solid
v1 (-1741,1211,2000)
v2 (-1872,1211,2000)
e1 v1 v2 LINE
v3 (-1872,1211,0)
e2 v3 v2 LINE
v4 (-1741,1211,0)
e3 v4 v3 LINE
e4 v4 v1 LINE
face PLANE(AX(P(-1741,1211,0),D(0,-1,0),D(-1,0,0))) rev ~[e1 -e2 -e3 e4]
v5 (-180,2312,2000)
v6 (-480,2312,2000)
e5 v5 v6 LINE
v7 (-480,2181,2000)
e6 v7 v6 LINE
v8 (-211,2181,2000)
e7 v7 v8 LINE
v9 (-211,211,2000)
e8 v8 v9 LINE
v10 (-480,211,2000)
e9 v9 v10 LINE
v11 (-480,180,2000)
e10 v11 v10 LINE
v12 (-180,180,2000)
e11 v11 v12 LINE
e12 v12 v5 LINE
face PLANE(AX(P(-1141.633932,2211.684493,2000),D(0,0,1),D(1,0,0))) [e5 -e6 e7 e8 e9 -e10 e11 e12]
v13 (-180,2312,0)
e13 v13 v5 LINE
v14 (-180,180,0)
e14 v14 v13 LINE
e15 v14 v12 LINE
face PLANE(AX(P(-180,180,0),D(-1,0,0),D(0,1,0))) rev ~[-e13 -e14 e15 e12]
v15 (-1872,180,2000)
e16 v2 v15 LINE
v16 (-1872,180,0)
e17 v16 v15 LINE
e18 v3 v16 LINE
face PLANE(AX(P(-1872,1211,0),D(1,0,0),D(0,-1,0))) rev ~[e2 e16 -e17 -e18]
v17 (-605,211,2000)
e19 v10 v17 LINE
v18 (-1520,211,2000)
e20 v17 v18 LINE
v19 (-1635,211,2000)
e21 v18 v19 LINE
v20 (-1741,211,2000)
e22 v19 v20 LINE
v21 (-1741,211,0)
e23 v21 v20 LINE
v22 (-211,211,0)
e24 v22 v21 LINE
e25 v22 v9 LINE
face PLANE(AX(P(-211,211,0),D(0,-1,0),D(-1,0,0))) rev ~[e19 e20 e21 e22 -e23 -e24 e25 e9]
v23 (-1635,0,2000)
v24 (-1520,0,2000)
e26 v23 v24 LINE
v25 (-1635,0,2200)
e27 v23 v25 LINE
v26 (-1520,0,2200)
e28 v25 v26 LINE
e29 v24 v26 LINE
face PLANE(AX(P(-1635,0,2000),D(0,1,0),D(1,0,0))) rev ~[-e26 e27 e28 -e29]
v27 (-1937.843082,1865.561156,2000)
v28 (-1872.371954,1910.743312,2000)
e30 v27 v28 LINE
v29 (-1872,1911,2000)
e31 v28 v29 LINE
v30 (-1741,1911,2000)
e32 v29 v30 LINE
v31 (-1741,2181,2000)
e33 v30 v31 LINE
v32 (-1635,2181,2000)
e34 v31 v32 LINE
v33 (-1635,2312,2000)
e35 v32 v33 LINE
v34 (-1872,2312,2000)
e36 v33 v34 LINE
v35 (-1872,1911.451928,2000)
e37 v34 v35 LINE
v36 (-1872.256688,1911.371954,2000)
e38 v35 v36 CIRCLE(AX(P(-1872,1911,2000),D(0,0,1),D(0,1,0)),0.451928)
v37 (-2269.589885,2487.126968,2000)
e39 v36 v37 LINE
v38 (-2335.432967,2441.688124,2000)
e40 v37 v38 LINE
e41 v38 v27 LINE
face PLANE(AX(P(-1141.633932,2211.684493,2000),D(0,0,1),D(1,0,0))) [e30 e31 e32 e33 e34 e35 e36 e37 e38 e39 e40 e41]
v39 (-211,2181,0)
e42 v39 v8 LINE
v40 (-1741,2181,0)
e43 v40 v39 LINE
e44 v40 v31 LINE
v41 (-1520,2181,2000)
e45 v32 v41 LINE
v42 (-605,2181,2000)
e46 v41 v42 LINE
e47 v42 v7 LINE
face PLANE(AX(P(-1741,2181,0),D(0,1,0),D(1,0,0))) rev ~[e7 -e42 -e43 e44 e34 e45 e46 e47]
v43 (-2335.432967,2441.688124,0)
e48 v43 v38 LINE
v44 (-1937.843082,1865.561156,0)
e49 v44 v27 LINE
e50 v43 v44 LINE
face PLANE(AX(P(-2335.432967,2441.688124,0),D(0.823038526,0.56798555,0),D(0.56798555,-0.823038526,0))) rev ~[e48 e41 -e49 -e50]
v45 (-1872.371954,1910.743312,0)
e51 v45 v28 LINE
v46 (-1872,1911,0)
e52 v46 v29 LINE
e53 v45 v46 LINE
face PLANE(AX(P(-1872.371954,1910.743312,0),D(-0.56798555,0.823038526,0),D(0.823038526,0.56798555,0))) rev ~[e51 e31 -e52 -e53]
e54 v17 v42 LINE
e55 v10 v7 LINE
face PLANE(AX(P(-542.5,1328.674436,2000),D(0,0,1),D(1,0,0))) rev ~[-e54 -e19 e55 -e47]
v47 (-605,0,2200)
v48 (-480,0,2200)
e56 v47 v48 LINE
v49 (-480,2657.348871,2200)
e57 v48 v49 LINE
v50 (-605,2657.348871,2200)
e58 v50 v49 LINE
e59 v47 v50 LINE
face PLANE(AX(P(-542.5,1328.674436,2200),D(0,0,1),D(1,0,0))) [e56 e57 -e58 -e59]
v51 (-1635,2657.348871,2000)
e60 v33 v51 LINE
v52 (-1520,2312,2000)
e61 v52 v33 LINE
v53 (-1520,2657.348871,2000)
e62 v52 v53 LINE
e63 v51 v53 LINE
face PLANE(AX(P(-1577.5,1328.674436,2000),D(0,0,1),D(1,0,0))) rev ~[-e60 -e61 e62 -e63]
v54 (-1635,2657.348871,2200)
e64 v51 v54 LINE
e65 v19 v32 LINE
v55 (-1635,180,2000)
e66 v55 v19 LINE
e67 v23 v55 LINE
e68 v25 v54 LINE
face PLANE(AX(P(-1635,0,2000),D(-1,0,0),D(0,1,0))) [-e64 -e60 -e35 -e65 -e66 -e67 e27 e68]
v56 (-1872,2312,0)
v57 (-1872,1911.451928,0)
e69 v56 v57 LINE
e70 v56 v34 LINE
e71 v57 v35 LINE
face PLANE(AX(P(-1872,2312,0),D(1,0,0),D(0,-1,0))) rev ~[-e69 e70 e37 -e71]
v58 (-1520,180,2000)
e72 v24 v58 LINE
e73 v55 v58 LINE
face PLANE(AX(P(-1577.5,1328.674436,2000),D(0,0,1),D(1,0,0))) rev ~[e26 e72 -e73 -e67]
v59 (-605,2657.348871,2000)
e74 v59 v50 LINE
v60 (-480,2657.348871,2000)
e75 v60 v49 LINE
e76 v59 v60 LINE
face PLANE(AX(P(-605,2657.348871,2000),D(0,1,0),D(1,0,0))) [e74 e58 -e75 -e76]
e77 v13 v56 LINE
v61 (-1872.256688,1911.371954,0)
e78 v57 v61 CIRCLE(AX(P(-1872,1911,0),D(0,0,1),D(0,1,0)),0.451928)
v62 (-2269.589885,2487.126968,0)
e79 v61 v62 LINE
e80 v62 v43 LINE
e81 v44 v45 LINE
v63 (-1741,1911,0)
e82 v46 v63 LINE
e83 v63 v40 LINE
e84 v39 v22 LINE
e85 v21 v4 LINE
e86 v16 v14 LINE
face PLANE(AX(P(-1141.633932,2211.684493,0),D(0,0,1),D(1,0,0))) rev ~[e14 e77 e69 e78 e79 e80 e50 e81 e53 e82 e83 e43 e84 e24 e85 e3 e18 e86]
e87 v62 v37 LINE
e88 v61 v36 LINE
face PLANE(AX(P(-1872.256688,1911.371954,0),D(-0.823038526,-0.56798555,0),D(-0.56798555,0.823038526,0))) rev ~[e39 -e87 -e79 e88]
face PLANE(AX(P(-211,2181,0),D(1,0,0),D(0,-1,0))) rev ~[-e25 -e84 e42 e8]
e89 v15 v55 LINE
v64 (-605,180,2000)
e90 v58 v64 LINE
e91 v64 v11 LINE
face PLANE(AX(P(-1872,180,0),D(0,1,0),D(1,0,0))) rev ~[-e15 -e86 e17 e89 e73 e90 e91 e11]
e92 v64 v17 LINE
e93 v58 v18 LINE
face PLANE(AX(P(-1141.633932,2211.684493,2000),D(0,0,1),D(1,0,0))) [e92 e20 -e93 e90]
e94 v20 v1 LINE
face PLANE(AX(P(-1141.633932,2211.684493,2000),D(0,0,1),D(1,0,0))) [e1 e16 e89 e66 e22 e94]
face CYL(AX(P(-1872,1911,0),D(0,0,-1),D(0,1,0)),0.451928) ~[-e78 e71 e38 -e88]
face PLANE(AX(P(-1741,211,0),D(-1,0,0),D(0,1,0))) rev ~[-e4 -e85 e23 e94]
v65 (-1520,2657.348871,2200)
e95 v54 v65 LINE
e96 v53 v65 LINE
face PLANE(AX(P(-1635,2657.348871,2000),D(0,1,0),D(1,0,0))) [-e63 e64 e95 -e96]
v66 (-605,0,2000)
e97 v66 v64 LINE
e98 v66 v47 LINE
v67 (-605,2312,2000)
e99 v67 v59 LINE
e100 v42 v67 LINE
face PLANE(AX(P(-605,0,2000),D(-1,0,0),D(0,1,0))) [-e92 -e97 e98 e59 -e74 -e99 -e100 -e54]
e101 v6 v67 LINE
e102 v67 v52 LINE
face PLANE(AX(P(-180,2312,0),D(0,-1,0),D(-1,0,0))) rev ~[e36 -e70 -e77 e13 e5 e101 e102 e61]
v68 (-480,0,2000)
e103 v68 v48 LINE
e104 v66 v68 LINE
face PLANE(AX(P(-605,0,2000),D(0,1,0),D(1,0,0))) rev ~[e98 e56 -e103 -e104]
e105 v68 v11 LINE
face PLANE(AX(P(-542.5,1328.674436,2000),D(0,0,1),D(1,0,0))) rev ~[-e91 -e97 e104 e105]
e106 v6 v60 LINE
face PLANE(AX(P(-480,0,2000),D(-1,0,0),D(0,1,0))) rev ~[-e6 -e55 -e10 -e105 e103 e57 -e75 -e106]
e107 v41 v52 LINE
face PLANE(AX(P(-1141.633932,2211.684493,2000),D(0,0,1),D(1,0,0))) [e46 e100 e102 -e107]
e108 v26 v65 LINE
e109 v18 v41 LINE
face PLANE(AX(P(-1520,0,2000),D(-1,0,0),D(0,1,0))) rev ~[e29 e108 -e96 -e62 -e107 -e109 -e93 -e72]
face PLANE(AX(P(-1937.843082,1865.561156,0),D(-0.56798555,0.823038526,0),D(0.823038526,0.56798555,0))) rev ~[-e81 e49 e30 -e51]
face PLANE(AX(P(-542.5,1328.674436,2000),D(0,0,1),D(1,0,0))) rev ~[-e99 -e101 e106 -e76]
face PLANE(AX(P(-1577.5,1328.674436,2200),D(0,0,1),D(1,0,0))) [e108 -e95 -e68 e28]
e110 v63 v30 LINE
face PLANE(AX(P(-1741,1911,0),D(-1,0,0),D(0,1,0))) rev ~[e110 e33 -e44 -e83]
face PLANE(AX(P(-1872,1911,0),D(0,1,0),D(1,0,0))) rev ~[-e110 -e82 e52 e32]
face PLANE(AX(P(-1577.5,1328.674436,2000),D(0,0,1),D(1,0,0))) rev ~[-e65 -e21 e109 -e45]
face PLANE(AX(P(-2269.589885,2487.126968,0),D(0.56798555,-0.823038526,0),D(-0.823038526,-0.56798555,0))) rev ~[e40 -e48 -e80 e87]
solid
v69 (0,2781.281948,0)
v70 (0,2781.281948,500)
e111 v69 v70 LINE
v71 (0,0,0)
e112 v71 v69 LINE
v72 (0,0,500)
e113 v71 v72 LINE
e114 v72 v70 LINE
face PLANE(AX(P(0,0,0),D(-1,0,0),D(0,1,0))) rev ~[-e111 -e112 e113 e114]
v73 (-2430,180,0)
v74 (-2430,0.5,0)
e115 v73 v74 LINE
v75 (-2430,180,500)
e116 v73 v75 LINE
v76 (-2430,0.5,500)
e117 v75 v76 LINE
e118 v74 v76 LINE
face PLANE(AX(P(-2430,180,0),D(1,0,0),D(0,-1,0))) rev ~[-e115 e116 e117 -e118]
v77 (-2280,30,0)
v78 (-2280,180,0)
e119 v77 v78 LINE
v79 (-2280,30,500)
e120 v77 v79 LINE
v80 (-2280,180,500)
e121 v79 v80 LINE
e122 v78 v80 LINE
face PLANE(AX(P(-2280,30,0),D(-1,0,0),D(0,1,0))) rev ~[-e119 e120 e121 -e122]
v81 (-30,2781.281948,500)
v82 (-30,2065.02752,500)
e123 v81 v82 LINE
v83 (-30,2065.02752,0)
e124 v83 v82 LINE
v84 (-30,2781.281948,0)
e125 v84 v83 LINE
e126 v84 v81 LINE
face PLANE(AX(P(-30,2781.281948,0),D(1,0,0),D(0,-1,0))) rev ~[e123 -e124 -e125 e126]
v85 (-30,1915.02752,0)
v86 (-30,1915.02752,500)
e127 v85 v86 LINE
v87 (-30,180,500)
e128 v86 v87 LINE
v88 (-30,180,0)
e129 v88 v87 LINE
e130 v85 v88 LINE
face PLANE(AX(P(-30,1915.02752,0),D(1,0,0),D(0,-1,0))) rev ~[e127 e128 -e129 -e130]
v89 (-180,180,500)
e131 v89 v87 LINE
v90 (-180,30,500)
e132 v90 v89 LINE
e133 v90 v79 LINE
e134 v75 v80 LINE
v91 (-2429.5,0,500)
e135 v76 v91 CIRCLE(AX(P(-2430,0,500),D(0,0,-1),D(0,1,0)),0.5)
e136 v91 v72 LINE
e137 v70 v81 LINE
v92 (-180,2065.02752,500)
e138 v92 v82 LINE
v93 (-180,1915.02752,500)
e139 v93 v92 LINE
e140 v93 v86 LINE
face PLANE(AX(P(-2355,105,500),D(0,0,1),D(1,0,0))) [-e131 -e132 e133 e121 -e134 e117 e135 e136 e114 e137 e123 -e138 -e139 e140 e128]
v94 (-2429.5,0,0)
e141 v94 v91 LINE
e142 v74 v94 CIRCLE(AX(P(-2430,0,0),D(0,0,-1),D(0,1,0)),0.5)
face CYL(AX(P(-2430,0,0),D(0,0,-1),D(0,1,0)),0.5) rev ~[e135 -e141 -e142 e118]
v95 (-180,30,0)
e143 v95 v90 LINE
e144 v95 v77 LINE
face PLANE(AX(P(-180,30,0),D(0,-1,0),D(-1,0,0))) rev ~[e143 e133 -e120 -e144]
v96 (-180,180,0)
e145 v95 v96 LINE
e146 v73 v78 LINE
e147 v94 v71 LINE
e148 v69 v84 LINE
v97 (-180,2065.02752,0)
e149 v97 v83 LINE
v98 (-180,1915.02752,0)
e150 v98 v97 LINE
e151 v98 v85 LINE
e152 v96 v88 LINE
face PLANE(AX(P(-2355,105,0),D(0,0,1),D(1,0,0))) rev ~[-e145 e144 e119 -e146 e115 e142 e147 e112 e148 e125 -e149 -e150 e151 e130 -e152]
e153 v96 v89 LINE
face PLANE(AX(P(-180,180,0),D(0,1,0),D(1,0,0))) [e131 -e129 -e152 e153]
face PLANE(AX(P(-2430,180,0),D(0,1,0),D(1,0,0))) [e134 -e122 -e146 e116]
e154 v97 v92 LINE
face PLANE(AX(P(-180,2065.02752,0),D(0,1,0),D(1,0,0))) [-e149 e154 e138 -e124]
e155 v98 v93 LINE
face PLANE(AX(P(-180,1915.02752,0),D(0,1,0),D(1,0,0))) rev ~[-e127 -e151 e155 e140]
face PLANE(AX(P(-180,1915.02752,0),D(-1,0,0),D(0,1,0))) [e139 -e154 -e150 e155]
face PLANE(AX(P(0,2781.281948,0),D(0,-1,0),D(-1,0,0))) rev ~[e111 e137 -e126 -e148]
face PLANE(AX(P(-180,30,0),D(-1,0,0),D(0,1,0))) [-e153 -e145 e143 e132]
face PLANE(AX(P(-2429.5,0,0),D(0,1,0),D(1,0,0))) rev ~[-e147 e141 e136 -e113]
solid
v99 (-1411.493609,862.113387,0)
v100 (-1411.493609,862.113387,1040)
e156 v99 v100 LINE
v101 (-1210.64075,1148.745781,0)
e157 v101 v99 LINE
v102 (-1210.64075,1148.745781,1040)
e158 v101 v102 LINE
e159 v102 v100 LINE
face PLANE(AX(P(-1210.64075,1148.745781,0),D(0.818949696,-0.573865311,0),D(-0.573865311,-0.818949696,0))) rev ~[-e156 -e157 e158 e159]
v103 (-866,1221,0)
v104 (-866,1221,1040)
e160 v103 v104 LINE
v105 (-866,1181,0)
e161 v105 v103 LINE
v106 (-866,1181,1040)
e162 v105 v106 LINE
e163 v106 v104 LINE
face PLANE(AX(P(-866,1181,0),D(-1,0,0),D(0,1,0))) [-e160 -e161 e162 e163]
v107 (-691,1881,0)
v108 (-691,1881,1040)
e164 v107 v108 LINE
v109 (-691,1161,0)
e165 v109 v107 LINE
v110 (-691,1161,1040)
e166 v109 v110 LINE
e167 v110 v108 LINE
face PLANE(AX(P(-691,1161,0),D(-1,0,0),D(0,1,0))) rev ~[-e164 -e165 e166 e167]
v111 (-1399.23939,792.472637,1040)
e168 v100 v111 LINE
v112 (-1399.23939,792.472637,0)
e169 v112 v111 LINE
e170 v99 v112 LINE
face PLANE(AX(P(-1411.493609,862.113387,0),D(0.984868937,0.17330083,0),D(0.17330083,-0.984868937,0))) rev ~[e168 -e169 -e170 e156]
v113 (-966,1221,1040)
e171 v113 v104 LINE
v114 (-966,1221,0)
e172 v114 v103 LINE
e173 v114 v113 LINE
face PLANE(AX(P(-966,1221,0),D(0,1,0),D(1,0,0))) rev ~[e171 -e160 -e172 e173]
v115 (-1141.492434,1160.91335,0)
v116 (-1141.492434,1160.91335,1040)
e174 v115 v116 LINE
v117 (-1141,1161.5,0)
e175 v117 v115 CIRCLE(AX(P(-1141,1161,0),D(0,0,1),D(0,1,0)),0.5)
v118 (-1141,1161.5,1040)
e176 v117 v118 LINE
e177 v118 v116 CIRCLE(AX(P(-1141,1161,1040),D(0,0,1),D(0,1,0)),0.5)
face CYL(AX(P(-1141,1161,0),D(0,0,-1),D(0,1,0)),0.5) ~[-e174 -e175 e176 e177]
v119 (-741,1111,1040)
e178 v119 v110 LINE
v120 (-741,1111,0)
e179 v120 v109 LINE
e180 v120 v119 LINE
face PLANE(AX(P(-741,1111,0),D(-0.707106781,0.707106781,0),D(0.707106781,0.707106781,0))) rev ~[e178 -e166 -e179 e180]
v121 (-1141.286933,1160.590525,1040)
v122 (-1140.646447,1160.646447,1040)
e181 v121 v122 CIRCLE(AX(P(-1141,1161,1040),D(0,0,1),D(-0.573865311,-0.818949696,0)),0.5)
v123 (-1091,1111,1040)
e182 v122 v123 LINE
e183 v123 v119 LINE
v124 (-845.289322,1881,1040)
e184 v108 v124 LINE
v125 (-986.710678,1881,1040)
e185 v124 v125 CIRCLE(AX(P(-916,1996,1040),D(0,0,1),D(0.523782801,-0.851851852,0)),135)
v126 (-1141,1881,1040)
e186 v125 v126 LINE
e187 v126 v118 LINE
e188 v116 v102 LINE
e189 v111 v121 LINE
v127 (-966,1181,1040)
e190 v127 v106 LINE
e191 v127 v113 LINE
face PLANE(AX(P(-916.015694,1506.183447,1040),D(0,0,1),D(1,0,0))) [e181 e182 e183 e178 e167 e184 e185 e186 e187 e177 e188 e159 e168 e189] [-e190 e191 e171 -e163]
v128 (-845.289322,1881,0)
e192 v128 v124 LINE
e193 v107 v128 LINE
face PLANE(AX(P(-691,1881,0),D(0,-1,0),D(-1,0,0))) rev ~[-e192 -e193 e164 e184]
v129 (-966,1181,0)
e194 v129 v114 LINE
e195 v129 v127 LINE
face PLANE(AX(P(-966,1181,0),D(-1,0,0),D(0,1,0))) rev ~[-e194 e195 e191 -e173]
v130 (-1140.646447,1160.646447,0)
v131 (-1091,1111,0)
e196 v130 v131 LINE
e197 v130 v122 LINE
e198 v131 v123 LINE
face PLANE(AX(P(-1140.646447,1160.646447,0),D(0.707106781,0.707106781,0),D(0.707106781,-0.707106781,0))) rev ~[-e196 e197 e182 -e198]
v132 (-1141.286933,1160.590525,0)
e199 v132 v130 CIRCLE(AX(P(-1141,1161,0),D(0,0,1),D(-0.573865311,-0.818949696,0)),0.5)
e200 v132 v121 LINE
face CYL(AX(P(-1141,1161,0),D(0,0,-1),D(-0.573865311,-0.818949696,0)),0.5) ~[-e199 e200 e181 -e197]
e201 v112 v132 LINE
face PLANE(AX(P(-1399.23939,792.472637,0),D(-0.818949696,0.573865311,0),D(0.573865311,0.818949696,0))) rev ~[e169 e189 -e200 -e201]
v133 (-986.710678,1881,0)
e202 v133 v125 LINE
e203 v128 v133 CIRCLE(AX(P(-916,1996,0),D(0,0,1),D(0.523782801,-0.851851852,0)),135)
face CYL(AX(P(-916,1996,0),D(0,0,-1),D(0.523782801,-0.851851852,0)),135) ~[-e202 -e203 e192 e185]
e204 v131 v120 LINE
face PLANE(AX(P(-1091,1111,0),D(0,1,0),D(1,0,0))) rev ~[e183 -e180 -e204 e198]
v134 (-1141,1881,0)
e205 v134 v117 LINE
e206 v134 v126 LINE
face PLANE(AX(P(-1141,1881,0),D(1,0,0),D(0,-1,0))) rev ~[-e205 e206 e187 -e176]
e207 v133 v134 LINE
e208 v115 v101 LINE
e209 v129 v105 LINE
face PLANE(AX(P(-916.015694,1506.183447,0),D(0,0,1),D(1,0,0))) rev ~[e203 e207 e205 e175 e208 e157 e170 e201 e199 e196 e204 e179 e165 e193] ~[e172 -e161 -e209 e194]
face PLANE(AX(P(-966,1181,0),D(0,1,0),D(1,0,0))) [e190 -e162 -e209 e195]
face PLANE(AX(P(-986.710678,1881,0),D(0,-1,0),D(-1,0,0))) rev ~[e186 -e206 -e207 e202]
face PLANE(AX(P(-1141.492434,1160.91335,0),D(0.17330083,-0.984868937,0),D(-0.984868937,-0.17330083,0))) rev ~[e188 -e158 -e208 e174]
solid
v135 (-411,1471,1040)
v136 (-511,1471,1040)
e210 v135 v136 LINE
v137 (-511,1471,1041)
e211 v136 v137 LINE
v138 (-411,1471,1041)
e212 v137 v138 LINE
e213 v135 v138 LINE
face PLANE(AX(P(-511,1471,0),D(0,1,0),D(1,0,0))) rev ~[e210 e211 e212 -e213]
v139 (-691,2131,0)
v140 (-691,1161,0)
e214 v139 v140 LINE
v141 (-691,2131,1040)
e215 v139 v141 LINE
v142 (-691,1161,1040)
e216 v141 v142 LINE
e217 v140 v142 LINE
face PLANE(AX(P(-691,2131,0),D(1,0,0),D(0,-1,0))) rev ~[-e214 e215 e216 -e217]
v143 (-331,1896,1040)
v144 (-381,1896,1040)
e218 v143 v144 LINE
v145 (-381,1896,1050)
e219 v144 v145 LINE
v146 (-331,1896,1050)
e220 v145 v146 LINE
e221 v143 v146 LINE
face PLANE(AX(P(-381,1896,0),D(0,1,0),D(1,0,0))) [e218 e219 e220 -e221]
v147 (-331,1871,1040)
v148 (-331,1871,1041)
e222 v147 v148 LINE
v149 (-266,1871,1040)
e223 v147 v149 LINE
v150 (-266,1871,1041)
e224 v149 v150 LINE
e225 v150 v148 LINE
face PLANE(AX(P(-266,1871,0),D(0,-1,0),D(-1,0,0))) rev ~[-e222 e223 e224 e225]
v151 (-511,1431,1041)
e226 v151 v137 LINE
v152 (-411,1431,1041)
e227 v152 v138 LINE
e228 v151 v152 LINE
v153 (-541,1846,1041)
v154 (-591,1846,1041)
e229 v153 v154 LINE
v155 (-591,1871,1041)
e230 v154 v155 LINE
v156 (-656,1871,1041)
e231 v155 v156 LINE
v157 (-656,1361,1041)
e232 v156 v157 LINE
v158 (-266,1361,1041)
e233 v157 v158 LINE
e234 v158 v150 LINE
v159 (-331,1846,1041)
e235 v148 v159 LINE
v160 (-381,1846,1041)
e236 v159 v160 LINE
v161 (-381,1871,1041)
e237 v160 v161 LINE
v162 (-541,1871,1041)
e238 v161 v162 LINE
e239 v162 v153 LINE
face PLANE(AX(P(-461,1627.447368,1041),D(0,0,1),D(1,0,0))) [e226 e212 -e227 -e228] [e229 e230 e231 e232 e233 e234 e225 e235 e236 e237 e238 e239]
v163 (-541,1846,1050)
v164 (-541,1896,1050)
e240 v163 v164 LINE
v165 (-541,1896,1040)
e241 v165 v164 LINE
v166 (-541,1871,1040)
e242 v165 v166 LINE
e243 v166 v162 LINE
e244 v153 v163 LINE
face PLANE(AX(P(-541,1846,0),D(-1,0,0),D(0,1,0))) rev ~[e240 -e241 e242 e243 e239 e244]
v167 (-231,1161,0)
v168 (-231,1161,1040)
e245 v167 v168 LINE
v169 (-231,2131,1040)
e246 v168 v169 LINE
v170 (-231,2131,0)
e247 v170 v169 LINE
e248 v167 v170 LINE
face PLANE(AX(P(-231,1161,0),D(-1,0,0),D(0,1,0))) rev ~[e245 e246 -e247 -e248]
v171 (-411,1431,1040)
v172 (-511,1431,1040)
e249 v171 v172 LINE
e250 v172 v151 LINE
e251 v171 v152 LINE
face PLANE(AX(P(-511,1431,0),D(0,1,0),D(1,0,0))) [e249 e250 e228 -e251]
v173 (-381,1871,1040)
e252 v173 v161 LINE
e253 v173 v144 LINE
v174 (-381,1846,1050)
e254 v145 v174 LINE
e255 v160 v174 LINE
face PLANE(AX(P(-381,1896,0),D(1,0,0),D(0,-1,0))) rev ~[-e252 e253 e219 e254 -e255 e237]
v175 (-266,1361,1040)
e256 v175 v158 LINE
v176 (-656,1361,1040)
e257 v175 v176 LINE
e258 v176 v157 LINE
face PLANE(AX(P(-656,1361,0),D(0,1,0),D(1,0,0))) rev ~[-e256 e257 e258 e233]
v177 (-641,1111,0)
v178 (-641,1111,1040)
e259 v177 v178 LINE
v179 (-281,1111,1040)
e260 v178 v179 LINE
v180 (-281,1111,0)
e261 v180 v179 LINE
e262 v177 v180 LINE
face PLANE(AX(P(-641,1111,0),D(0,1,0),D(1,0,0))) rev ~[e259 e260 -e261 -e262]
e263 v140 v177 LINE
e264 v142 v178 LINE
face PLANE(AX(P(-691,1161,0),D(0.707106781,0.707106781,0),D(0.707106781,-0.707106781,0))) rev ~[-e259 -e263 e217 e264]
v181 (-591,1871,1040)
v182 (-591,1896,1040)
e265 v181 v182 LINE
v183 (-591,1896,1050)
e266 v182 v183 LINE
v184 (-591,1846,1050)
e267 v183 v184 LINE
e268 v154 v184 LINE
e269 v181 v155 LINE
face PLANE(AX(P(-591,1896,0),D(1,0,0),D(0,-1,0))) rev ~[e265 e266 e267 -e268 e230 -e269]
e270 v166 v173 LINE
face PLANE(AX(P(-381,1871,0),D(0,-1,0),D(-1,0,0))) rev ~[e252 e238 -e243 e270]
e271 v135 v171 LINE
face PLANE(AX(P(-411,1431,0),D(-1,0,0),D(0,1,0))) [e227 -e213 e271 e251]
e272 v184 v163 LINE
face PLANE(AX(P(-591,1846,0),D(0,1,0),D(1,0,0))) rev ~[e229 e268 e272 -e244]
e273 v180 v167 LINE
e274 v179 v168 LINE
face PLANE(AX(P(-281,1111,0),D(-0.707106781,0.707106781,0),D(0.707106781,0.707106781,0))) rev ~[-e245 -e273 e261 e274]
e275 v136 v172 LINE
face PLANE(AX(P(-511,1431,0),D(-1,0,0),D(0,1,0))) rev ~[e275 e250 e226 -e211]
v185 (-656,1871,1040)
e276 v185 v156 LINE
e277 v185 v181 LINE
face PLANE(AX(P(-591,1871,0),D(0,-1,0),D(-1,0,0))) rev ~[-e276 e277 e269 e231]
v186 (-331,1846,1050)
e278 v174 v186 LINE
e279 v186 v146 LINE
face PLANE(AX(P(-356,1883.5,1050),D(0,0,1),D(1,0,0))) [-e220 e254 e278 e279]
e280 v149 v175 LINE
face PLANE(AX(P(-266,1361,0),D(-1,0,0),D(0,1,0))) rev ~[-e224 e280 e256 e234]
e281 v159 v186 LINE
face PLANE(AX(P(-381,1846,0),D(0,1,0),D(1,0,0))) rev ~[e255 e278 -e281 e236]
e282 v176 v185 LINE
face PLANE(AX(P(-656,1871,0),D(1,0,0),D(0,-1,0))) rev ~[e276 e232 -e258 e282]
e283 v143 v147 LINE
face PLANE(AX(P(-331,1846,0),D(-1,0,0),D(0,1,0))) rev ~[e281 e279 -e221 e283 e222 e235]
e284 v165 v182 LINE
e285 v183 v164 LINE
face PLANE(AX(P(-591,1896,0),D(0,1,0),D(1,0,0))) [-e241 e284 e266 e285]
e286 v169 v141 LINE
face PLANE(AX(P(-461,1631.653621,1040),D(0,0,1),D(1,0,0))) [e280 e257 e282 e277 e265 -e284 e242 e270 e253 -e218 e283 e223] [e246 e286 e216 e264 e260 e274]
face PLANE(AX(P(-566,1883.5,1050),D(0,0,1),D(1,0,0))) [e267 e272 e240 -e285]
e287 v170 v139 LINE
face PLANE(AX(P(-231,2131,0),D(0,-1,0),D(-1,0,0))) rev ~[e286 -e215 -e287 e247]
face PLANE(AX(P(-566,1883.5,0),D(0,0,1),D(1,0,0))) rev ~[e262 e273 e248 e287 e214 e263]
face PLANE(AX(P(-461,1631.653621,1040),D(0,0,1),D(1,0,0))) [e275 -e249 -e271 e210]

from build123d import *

# Parameters (mm, degrees)
F0_W     = 100
F0_H     = 40
F0_W_2   = 130
F0_H_2   = 65.0866451263
F1_DEPTH = 1040
F0_W_3   = 50
F0_H_3   = 25
F2_DEPTH = 1040
F3_DEPTH = 1041
F4_DEPTH = 1050
F0_W_4   = 31
F0_H_4   = 131
F0_H_5   = 31
F5_DEPTH = 2000
F6_W     = 125
F6_H     = 2657.3488712311
F6_W_2   = 115
F7_DEPTH = 200
F0_W_5   = 150
F0_H_6   = 150
F8_DEPTH = 500


# Not quite as in the source:
# - a feature names something its author has since deleted; it is built from what else it names


with BuildPart() as f1:
    # F0 (on Top) → F1 (new body)
    with BuildSketch(Plane.XY):
        with BuildLine():
            ThreePointArc((-845.2893218813, 1881), (-916, 1861), (-986.7106781187, 1881))
            Line((-986.7106781187, 1881), (-1141, 1881))
            Line((-1141, 1881), (-1141, 1161.5))
            ThreePointArc((-1141, 1161.5), (-1140.6464466094, 1161.3535533906), (-1140.5, 1161))
            ThreePointArc((-1140.5, 1161), (-1140.5380602337, 1160.8086582838), (-1140.6464466094, 1160.6464466094))
            Line((-1140.6464466094, 1160.6464466094), (-1091, 1111))
            Line((-1091, 1111), (-741, 1111))
            Line((-741, 1111), (-691, 1161))
            Line((-691, 1161), (-691, 1881))
            Line((-691, 1881), (-845.2893218813, 1881))
        make_face()
        with Locations((-916, 1201)):
            Rectangle(F0_W, F0_H, mode=Mode.SUBTRACT)
        with BuildLine():
            Line((-851, 1881), (-981, 1881))
            Line((-981, 1881), (-986.7106781187, 1881))
            ThreePointArc((-986.7106781187, 1881), (-916, 1861), (-845.2893218813, 1881))
            Line((-845.2893218813, 1881), (-851, 1881))
        make_face()
        with BuildLine():
            Line((-1141.2869326556, 1160.590525152), (-1141, 1161))
            Line((-1141, 1161), (-1141.4924344683, 1160.9133495848))
            ThreePointArc((-1141.4924344683, 1160.9133495848), (-1141.421790448, 1160.7314989424), (-1141.2869326556, 1160.590525152))
        make_face()
        with BuildLine():
            ThreePointArc((-1141.2869326556, 1160.590525152), (-1141.421790448, 1160.7314989424), (-1141.4924344683, 1160.9133495848))
            Line((-1141.4924344683, 1160.9133495848), (-1210.6407503609, 1148.7457807602))
            Line((-1210.6407503609, 1148.7457807602), (-1411.4936092846, 862.1133871579))
            Line((-1411.4936092846, 862.1133871579), (-1399.2393900448, 792.4726367971))
            Line((-1399.2393900448, 792.4726367971), (-1141.2869326556, 1160.590525152))
        make_face()
        with BuildLine():
            ThreePointArc((-1140.5, 1161), (-1140.6464466094, 1161.3535533906), (-1141, 1161.5))
            Line((-1141, 1161.5), (-1141, 1161))
            Line((-1141, 1161), (-1140.6464466094, 1160.6464466094))
            ThreePointArc((-1140.6464466094, 1160.6464466094), (-1140.5380602337, 1160.8086582838), (-1140.5, 1161))
        make_face()
        with BuildLine():
            Line((-1140.6464466094, 1160.6464466094), (-1141, 1161))
            Line((-1141, 1161), (-1141.2869326556, 1160.590525152))
            ThreePointArc((-1141.2869326556, 1160.590525152), (-1140.9565099674, 1160.5018949739), (-1140.6464466094, 1160.6464466094))
        make_face()
        with BuildLine():
            Line((-1141, 1161), (-1141, 1161.5))
            ThreePointArc((-1141, 1161.5), (-1141.3829655387, 1161.3214613448), (-1141.4924344683, 1160.9133495848))
            Line((-1141.4924344683, 1160.9133495848), (-1141, 1161))
        make_face()
        with Locations((-916, 1913.5433225632)):
            Rectangle(F0_W_2, F0_H_2)
        with BuildLine():
            Line((-986.7106781187, 1881), (-981, 1881))
            Line((-981, 1881), (-981, 1946.0866451263))
            Line((-981, 1946.0866451263), (-851, 1946.0866451263))
            Line((-851, 1946.0866451263), (-851, 1881))
            Line((-851, 1881), (-845.2893218813, 1881))
            ThreePointArc((-845.2893218813, 1881), (-798.1633725321, 1930.1248967592), (-781, 1996))
            ThreePointArc((-781, 1996), (-981.8751032408, 2113.8366274679), (-986.7106781187, 1881))
        make_face()
    extrude(amount=F1_DEPTH)


with BuildPart() as f2:
    # F0 (on Top) → F2 (new body)
    with BuildSketch(Plane.XY):
        Polygon((-691, 2131), (-691, 1881), (-691, 1161), (-641, 1111), (-281, 1111), (-231, 1161), (-231, 2131), align=None)
        Polygon((-656, 1361), (-656, 1871), (-591, 1871), (-591, 1896), (-541, 1896), (-541, 1871), (-381, 1871), (-381, 1896), (-331, 1896), (-331, 1871), (-266, 1871), (-266, 1361), align=None, mode=Mode.SUBTRACT)
        Polygon((-591, 1871), (-656, 1871), (-656, 1361), (-266, 1361), (-266, 1871), (-331, 1871), (-331, 1846), (-381, 1846), (-381, 1871), (-541, 1871), (-541, 1846), (-591, 1846), align=None)
        with Locations((-461, 1451)):
            Rectangle(F0_W, F0_H, mode=Mode.SUBTRACT)
        with Locations((-461, 1451)):
            Rectangle(F0_W, F0_H)
        with Locations((-566, 1858.5)):
            Rectangle(F0_W_3, F0_H_3)
        with Locations((-566, 1883.5)):
            Rectangle(F0_W_3, F0_H_3)
        with Locations((-356, 1883.5)):
            Rectangle(F0_W_3, F0_H_3)
        with Locations((-356, 1858.5)):
            Rectangle(F0_W_3, F0_H_3)
    extrude(amount=F2_DEPTH)

    # F0 (on Top) → F3 (join)
    with BuildSketch(Plane.XY):
        Polygon((-591, 1871), (-656, 1871), (-656, 1361), (-266, 1361), (-266, 1871), (-331, 1871), (-331, 1846), (-381, 1846), (-381, 1871), (-541, 1871), (-541, 1846), (-591, 1846), align=None)
        with Locations((-461, 1451)):
            Rectangle(F0_W, F0_H, mode=Mode.SUBTRACT)
    extrude(amount=F3_DEPTH)

    # F0 (on Top) → F4 (join)
    with BuildSketch(Plane.XY):
        with Locations((-566, 1883.5)):
            Rectangle(F0_W_3, F0_H_3)
        with Locations((-566, 1858.5)):
            Rectangle(F0_W_3, F0_H_3)
        with Locations((-356, 1883.5)):
            Rectangle(F0_W_3, F0_H_3)
        with Locations((-356, 1858.5)):
            Rectangle(F0_W_3, F0_H_3)
    extrude(amount=F4_DEPTH)


with BuildPart() as f5:
    # F0 (on Top) → F5 (new body)
    with BuildSketch(Plane.XY):
        with BuildLine():
            Line((-1741, 2181), (-211, 2181))
            Line((-211, 2181), (-211, 2312))
            Line((-211, 2312), (-1872, 2312))
            Line((-1872, 2312), (-1872, 1911.4519278278))
            ThreePointArc((-1872, 1911.4519278278), (-1871.6804387684, 1911.3195612316), (-1871.5480721722, 1911))
            Line((-1871.5480721722, 1911), (-1741, 1911))
            Line((-1741, 1911), (-1741, 2181))
        make_face()
        with Locations((-195.5, 2246.5)):
            Rectangle(F0_W_4, F0_H_4)
        Polygon((-180, 1915.0275195633), (-180, 2065.0275195633), (-180, 2181), (-211, 2181), (-211, 211), (-180, 211), align=None)
        with Locations((-195.5, 195.5)):
            Rectangle(F0_W_4, F0_H_5)
        Polygon((-1872, 180), (-211, 180), (-211, 211), (-1741, 211), (-1741, 1211), (-1872, 1211), align=None)
        with BuildLine():
            Line((-1872.3719540131, 1910.743311524), (-1872, 1911))
            Line((-1872, 1911), (-1872.256688476, 1911.3719540131))
            ThreePointArc((-1872.256688476, 1911.3719540131), (-1872.444517367, 1911.0815050429), (-1872.3719540131, 1910.743311524))
        make_face()
        with BuildLine():
            ThreePointArc((-1872.3719540131, 1910.743311524), (-1872.444517367, 1911.0815050429), (-1872.256688476, 1911.3719540131))
            Line((-1872.256688476, 1911.3719540131), (-2269.5898852459, 2487.1269679074))
            Line((-2269.5898852459, 2487.1269679074), (-2335.4329672925, 2441.6881238793))
            Line((-2335.4329672925, 2441.6881238793), (-1937.8430820466, 1865.5611559719))
            Line((-1937.8430820466, 1865.5611559719), (-1872.3719540131, 1910.743311524))
        make_face()
        with BuildLine():
            ThreePointArc((-1871.5480721722, 1911), (-1871.6804387684, 1911.3195612316), (-1872, 1911.4519278278))
            Line((-1872, 1911.4519278278), (-1872, 1911))
            Line((-1872, 1911), (-1871.5480721722, 1911))
        make_face()
        with BuildLine():
            Line((-1872, 1911), (-1872, 1911.4519278278))
            ThreePointArc((-1872, 1911.4519278278), (-1872.1344291493, 1911.4314713958), (-1872.256688476, 1911.3719540131))
            Line((-1872.256688476, 1911.3719540131), (-1872, 1911))
        make_face()
    extrude(amount=F5_DEPTH)

    # F6 (on face) → F7 (join)
    with BuildSketch(Plane.XY.offset(2000)):
        with Locations((-542.5, 1328.6744356155)):
            Rectangle(F6_W, F6_H)
        with Locations((-1577.5, 1328.6744356155)):
            Rectangle(F6_W_2, F6_H)
    extrude(amount=F7_DEPTH)


with BuildPart() as f8:
    # F0 (on Top) → F8 (new body)
    with BuildSketch(Plane.XY):
        with Locations((-2355, 105)):
            Rectangle(F0_W_5, F0_H_6)
        with BuildLine():
            Line((0, 2781.2819480896), (-30, 2781.2819480896))
            Line((-30, 2781.2819480896), (-30, 2065.0275195633))
            Line((-30, 2065.0275195633), (-30, 1915.0275195633))
            Line((-30, 1915.0275195633), (-30, 180))
            Line((-30, 180), (-30, 30))
            Line((-30, 30), (-180, 30))
            Line((-180, 30), (-2280, 30))
            Line((-2280, 30), (-2430, 30))
            Line((-2430, 30), (-2430, 0.5))
            ThreePointArc((-2430, 0.5), (-2429.6464466094, 0.3535533906), (-2429.5, 0))
            Line((-2429.5, 0), (0, 0))
            Line((0, 0), (0, 2781.2819480896))
        make_face()
        with Locations((-105, 105)):
            Rectangle(F0_W_5, F0_H_6)
        with Locations((-105, 1990.0275195633)):
            Rectangle(F0_W_5, F0_H_6)
    extrude(amount=F8_DEPTH)


solid = Compound([f1.part, f2.part, f5.part, f8.part])
